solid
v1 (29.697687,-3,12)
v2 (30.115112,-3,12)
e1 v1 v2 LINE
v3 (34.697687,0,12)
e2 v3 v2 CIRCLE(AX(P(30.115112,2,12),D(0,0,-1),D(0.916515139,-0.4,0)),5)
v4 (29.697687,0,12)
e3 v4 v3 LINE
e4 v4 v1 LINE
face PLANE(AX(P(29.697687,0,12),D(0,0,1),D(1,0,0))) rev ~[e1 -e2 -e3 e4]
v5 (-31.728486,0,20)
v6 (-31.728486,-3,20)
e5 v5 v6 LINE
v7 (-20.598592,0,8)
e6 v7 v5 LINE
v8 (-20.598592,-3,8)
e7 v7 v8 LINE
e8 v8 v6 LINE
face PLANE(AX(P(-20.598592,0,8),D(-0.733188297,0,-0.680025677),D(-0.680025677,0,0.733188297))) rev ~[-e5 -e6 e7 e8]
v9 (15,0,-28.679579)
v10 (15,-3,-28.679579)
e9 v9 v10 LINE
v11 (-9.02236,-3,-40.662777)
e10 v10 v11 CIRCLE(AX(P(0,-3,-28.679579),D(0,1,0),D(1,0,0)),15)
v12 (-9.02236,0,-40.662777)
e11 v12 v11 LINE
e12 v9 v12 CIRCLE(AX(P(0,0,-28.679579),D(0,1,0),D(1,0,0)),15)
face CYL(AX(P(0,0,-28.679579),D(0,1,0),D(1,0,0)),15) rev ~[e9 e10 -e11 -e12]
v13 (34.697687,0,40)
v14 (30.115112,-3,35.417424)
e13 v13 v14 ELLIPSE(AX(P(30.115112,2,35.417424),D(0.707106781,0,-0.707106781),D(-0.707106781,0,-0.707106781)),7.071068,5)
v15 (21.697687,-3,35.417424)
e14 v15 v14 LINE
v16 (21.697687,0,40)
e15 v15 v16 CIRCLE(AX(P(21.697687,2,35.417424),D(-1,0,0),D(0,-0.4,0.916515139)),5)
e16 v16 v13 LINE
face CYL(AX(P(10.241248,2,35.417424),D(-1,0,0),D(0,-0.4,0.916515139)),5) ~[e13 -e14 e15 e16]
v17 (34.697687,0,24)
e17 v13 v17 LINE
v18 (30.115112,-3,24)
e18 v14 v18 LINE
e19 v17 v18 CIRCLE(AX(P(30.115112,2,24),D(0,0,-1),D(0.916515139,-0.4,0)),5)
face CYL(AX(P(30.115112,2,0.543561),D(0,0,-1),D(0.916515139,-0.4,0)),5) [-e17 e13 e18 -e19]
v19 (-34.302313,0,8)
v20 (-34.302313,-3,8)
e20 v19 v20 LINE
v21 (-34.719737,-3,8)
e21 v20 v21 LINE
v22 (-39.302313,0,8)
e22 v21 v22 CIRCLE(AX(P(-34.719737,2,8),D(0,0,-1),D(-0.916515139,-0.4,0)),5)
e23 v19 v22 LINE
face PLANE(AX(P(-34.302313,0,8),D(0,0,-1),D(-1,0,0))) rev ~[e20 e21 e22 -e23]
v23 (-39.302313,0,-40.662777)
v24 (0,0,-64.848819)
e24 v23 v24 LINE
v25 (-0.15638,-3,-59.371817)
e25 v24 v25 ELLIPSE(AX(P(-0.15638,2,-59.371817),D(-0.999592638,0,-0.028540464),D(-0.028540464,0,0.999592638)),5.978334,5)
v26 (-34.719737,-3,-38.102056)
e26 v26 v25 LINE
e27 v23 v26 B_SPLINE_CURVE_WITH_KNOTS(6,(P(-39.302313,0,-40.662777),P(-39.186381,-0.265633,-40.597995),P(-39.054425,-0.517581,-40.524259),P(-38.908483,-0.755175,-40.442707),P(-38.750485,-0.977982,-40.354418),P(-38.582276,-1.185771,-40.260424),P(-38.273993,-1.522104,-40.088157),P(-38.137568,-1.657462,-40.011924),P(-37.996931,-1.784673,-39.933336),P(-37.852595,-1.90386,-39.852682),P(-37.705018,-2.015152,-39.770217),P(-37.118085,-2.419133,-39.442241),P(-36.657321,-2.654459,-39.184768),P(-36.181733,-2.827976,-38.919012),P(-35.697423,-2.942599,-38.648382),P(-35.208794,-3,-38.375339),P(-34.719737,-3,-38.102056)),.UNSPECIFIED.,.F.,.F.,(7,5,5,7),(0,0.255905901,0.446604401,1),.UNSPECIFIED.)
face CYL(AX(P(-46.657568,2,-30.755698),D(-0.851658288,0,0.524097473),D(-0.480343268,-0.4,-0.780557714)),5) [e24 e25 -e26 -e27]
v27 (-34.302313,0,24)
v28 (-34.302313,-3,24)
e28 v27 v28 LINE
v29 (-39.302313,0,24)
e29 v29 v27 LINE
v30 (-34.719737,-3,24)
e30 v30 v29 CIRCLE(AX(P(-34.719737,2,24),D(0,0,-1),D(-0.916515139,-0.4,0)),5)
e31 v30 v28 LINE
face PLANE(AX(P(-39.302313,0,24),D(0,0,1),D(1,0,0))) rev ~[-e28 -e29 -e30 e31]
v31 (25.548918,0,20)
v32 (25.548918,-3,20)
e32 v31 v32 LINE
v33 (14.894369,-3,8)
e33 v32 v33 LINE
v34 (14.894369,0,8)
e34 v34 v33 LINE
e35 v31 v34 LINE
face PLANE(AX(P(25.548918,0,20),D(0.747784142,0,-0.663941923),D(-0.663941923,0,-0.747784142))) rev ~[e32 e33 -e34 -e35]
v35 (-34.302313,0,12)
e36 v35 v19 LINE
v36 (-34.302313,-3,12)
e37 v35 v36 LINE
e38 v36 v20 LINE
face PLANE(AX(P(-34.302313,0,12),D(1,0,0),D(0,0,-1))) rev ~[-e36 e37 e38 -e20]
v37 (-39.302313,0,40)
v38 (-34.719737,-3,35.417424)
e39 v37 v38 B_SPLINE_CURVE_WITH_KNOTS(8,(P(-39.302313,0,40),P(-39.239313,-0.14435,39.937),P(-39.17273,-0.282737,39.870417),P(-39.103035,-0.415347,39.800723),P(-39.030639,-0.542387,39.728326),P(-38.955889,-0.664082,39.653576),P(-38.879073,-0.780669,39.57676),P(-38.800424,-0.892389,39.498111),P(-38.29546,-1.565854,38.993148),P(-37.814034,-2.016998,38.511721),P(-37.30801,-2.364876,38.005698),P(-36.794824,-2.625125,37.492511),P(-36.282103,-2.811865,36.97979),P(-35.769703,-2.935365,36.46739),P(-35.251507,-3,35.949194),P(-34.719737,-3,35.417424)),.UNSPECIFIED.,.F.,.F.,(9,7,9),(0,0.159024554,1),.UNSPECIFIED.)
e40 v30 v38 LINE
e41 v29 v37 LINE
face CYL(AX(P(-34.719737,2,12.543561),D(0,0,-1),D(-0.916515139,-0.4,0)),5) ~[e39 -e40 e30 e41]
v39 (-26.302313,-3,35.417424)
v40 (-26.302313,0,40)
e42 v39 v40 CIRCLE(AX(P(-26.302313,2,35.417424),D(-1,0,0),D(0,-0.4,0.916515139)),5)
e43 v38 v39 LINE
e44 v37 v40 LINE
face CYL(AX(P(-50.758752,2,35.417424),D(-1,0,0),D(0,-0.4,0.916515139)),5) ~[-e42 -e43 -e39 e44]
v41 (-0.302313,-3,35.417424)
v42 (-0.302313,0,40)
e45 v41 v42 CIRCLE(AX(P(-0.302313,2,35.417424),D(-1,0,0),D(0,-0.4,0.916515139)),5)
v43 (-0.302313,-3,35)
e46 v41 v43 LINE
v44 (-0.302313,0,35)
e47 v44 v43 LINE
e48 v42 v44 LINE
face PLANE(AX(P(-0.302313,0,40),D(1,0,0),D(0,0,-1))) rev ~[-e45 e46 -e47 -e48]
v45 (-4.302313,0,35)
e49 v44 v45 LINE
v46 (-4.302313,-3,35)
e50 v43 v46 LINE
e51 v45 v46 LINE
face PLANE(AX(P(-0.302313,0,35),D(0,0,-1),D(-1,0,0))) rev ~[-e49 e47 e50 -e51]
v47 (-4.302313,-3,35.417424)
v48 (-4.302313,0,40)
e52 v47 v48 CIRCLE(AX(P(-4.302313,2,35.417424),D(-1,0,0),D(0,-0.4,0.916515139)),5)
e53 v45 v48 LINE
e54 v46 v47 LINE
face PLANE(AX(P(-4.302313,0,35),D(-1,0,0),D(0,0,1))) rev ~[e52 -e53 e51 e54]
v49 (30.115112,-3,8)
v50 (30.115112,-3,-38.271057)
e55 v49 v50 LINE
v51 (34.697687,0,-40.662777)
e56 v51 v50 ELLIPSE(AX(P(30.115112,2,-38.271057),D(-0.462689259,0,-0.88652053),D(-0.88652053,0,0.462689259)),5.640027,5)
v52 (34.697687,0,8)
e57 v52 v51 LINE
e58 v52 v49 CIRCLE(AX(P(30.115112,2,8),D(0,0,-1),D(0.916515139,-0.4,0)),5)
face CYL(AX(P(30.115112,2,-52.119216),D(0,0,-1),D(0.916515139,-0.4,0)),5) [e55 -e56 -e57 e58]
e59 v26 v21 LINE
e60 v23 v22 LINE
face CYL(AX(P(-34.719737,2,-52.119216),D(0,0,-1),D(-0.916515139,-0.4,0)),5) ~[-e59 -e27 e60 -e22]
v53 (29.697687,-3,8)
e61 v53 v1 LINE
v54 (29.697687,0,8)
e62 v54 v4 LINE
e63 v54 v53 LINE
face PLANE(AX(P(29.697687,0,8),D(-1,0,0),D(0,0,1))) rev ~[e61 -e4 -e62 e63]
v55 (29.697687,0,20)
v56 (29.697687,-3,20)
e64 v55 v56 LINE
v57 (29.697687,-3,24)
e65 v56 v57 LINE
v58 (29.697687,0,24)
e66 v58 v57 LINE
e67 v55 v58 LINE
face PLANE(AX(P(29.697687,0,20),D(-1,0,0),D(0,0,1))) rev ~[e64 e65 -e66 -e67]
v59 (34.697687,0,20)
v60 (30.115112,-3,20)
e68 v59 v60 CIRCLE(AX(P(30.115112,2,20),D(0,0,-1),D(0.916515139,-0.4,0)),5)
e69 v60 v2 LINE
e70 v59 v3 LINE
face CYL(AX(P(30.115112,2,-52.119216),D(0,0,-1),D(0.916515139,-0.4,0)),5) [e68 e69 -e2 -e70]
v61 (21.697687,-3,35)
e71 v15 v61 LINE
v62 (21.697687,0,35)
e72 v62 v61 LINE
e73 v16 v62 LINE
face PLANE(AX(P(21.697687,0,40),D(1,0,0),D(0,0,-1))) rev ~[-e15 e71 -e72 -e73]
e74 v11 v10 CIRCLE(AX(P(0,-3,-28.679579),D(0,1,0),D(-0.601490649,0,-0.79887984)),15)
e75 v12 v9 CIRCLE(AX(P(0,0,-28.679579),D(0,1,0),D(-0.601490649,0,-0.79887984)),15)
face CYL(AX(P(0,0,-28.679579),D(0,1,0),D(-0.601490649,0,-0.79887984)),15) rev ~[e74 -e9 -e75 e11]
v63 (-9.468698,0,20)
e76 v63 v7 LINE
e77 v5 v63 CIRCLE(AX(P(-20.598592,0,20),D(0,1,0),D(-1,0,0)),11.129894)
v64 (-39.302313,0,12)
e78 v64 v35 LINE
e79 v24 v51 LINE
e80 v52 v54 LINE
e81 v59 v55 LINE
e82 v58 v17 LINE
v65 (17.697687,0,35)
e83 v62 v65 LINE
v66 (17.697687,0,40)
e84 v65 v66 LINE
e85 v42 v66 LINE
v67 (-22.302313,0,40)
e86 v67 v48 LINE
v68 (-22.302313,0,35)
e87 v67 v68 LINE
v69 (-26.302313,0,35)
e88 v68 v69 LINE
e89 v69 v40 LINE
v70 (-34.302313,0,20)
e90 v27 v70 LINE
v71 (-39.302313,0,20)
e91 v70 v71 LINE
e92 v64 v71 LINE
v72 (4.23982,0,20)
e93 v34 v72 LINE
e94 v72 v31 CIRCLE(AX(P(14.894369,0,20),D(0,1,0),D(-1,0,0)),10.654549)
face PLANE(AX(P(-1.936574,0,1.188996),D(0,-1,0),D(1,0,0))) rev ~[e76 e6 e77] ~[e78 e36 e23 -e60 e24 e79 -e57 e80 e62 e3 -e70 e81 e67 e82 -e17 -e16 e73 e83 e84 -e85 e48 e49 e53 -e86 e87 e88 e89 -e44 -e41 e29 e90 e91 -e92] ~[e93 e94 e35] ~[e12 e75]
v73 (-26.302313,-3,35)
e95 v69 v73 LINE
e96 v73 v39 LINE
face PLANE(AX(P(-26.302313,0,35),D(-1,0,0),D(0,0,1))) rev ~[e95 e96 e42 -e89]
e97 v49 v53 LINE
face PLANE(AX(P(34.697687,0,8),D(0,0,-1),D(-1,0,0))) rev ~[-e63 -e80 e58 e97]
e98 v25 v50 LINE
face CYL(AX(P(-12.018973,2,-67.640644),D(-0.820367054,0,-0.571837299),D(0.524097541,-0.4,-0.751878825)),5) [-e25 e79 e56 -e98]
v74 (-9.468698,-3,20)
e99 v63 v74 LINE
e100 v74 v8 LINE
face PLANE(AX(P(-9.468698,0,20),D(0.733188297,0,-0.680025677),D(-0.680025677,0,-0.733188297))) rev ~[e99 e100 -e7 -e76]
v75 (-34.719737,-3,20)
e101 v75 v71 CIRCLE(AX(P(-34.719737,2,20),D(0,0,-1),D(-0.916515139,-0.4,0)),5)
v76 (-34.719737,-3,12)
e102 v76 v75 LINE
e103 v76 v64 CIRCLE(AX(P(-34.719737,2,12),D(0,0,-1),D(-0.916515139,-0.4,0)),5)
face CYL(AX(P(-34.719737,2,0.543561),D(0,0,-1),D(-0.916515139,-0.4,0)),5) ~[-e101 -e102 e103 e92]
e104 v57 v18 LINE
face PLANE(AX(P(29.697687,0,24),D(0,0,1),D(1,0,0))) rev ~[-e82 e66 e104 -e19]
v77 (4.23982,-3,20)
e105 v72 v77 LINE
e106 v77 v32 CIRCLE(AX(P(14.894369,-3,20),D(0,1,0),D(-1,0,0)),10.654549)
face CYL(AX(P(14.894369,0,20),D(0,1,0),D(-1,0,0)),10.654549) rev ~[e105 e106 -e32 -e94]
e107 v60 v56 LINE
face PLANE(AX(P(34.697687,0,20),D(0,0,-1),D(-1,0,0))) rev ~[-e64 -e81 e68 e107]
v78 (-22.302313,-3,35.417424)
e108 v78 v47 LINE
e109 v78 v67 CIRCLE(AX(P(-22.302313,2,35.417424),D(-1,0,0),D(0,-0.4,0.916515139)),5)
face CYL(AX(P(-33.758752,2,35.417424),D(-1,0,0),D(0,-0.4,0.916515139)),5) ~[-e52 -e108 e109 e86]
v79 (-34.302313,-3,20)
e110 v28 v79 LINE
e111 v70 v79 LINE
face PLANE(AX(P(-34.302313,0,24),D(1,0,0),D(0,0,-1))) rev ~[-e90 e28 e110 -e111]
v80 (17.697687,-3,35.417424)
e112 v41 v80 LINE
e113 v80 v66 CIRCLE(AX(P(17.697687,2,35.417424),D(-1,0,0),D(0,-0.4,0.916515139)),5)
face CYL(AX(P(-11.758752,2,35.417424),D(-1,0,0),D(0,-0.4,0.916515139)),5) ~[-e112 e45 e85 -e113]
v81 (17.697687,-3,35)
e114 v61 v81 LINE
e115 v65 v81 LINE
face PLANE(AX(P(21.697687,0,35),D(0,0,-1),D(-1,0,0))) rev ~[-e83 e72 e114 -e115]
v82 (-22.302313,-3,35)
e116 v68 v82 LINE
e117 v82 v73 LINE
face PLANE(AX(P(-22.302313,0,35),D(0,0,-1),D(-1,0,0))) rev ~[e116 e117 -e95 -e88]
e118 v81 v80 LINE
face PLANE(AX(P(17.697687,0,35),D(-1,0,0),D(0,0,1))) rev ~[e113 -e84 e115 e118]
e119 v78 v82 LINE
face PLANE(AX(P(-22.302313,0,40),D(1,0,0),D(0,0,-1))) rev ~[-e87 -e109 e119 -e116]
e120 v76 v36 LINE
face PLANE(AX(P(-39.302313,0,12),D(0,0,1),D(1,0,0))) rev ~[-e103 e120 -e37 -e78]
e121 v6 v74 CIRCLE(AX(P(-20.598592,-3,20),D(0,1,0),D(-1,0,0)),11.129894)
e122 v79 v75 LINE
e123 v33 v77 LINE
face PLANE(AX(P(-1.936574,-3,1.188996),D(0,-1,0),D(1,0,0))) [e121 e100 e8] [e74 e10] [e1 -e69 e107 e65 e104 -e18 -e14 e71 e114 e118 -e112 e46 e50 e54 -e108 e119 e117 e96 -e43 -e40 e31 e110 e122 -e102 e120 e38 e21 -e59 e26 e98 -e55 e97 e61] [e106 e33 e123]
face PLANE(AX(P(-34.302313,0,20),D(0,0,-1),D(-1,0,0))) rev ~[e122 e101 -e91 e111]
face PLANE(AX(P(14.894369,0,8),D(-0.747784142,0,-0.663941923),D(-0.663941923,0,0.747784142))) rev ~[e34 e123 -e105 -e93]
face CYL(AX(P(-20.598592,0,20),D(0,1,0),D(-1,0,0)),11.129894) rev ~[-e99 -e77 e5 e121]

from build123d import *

# Parameters (mm, degrees)
F1_DEPTH     = 3
F2_T1_DEPTH  = 69.0608621697
F2_T3_DEPTH  = 65.2081986538
F2_T5_DEPTH  = 71.5756555765
F2_T7_DEPTH  = 30.9128784748
F2_T9_DEPTH  = 38.9128784748
F2_T11_DEPTH = 35.9128784748
F2_T13_DEPTH = 40.9128784748
F2_T15_DEPTH = 40.9128784748
F2_T17_DEPTH = 35.9128784748


# Not quite as in the source:
# - a fillet or chamfer that OpenCascade refuses, or shapes differently, is made with other operations: its cross-section is extruded or revolved along the edge and cut away or added


with BuildPart() as f1:
    # F0 (on Front) → F1 (new body)
    with BuildSketch(Plane.XZ):
        with BuildLine():
            Line((-39.3023127707, 0), (-39.3023127707, -40.6627771018))
            Line((-39.3023127707, -40.6627771018), (-9.0223597329, -40.6627771018))
            ThreePointArc((-9.0223597329, -40.6627771018), (-6.6956927949, -15.256923351), (15, -28.6795794964))
            ThreePointArc((15, -28.6795794964), (13.4226561454, -35.3752722912), (9.0223597329, -40.6627771018))
            Line((9.0223597329, -40.6627771018), (34.6976872293, -40.6627771018))
            Line((34.6976872293, -40.6627771018), (34.6976872293, 0))
            Line((34.6976872293, 0), (34.6976872293, 8))
            Line((34.6976872293, 8), (29.6976872293, 8))
            Line((29.6976872293, 8), (29.6976872293, 12))
            Line((29.6976872293, 12), (34.6976872293, 12))
            Line((34.6976872293, 12), (34.6976872293, 20))
            Line((34.6976872293, 20), (29.6976872293, 20))
            Line((29.6976872293, 20), (29.6976872293, 24))
            Line((29.6976872293, 24), (34.6976872293, 24))
            Line((34.6976872293, 24), (34.6976872293, 40))
            Line((34.6976872293, 40), (21.6976872293, 40))
            Line((21.6976872293, 40), (21.6976872293, 35))
            Line((21.6976872293, 35), (17.6976872293, 35))
            Line((17.6976872293, 35), (17.6976872293, 40))
            Line((17.6976872293, 40), (-0.3023127707, 40))
            Line((-0.3023127707, 40), (-0.3023127707, 35))
            Line((-0.3023127707, 35), (-4.3023127707, 35))
            Line((-4.3023127707, 35), (-4.3023127707, 40))
            Line((-4.3023127707, 40), (-22.3023127707, 40))
            Line((-22.3023127707, 40), (-22.3023127707, 35))
            Line((-22.3023127707, 35), (-26.3023127707, 35))
            Line((-26.3023127707, 35), (-26.3023127707, 40))
            Line((-26.3023127707, 40), (-39.3023127707, 40))
            Line((-39.3023127707, 40), (-39.3023127707, 24))
            Line((-39.3023127707, 24), (-34.3023127707, 24))
            Line((-34.3023127707, 24), (-34.3023127707, 20))
            Line((-34.3023127707, 20), (-39.3023127707, 20))
            Line((-39.3023127707, 20), (-39.3023127707, 12))
            Line((-39.3023127707, 12), (-34.3023127707, 12))
            Line((-34.3023127707, 12), (-34.3023127707, 8))
            Line((-34.3023127707, 8), (-39.3023127707, 8))
            Line((-39.3023127707, 8), (-39.3023127707, 0))
        make_face()
        with BuildLine():
            ThreePointArc((-31.7284863554, 20), (-20.5985922366, 31.1298941188), (-9.4686981178, 20))
            Line((-9.4686981178, 20), (-20.5985922366, 8))
            Line((-20.5985922366, 8), (-31.7284863554, 20))
        make_face(mode=Mode.SUBTRACT)
        with BuildLine():
            ThreePointArc((4.2398196727, 20), (14.8943690583, 30.6545493856), (25.5489184439, 20))
            Line((25.5489184439, 20), (14.8943690583, 8))
            Line((14.8943690583, 8), (4.2398196727, 20))
        make_face(mode=Mode.SUBTRACT)
        with BuildLine():
            Line((-9.0223597329, -40.6627771018), (-39.3023127707, -40.6627771018))
            Line((-39.3023127707, -40.6627771018), (0, -64.8488187371))
            Line((0, -64.8488187371), (34.6976872293, -40.6627771018))
            Line((34.6976872293, -40.6627771018), (9.0223597329, -40.6627771018))
            ThreePointArc((9.0223597329, -40.6627771018), (0, -43.6795794964), (-9.0223597329, -40.6627771018))
        make_face()
    extrude(amount=F1_DEPTH)

    # F2: fillet of radius 5 on 12 edges, made by hand

    # F2_s2 → F2_t1 (cut)
    with BuildSketch(Plane(origin=(-20.1138870842, 0, 12.3777782062), x_dir=(0, 1, 0), z_dir=(0.8516582876, 0, -0.5240974729))):
        with BuildLine():
            ThreePointArc((0, -55.2290339197), (-2.1833001327, -53.3850710123), (-3, -50.6464582247))
            Line((-3, -50.6464582247), (-3, -55.2290339197))
            Line((-3, -55.2290339197), (0, -55.2290339197))
        make_face()
    extrude(amount=F2_T1_DEPTH, mode=Mode.SUBTRACT)

    # F2_s4 → F2_t3 (cut)
    with BuildSketch(Plane(origin=(-39.8201349052, 0, -27.7566465561), x_dir=(0, 1, 0), z_dir=(0.8203670544, 0, 0.5718372986))):
        with BuildLine():
            ThreePointArc((0, -53.1998344073), (-2.1833001327, -51.3558714999), (-3, -48.6172587124))
            Line((-3, -48.6172587124), (-3, -53.1998344073))
            Line((-3, -53.1998344073), (0, -53.1998344073))
        make_face()
    extrude(amount=F2_T3_DEPTH, mode=Mode.SUBTRACT)

    # F2_s6 → F2_t5 (cut)
    with BuildSketch(Plane.XY.offset(-52.1192163392)):
        with BuildLine():
            ThreePointArc((-39.3023127707, 0), (-37.4583498632, -2.1833001327), (-34.7197370757, -3))
            Line((-34.7197370757, -3), (-39.3023127707, -3))
            Line((-39.3023127707, -3), (-39.3023127707, 0))
        make_face()
        with BuildLine():
            ThreePointArc((34.6976872293, 0), (32.8537243219, -2.1833001327), (30.1151115344, -3))
            Line((30.1151115344, -3), (34.6976872293, -3))
            Line((34.6976872293, -3), (34.6976872293, 0))
        make_face()
    extrude(amount=F2_T5_DEPTH, mode=Mode.SUBTRACT)

    # F2_s8 → F2_t7 (cut)
    with BuildSketch(Plane.XY.offset(0.5435607626)):
        with BuildLine():
            ThreePointArc((-39.3023127707, 0), (-37.4583498632, -2.1833001327), (-34.7197370757, -3))
            Line((-34.7197370757, -3), (-39.3023127707, -3))
            Line((-39.3023127707, -3), (-39.3023127707, 0))
        make_face()
        with BuildLine():
            ThreePointArc((34.6976872293, 0), (32.8537243219, -2.1833001327), (30.1151115344, -3))
            Line((30.1151115344, -3), (34.6976872293, -3))
            Line((34.6976872293, -3), (34.6976872293, 0))
        make_face()
    extrude(amount=F2_T7_DEPTH, mode=Mode.SUBTRACT)

    # F2_s10 → F2_t9 (cut)
    with BuildSketch(Plane.XY.offset(12.5435607626)):
        with BuildLine():
            ThreePointArc((-39.3023127707, 0), (-37.4583498632, -2.1833001327), (-34.7197370757, -3))
            Line((-34.7197370757, -3), (-39.3023127707, -3))
            Line((-39.3023127707, -3), (-39.3023127707, 0))
        make_face()
        with BuildLine():
            ThreePointArc((34.6976872293, 0), (32.8537243219, -2.1833001327), (30.1151115344, -3))
            Line((30.1151115344, -3), (34.6976872293, -3))
            Line((34.6976872293, -3), (34.6976872293, 0))
        make_face()
    extrude(amount=F2_T9_DEPTH, mode=Mode.SUBTRACT)

    # F2_s12 → F2_t11 (cut)
    with BuildSketch(Plane.YZ.offset(-50.7587520081)):
        with BuildLine():
            ThreePointArc((0, 40), (-2.1833001327, 38.1560370926), (-3, 35.417424305))
            Line((-3, 35.417424305), (-3, 40))
            Line((-3, 40), (0, 40))
        make_face()
    extrude(amount=F2_T11_DEPTH, mode=Mode.SUBTRACT)

    # F2_s14 → F2_t13 (cut)
    with BuildSketch(Plane.YZ.offset(-33.7587520081)):
        with BuildLine():
            ThreePointArc((0, 40), (-2.1833001327, 38.1560370926), (-3, 35.417424305))
            Line((-3, 35.417424305), (-3, 40))
            Line((-3, 40), (0, 40))
        make_face()
    extrude(amount=F2_T13_DEPTH, mode=Mode.SUBTRACT)

    # F2_s16 → F2_t15 (cut)
    with BuildSketch(Plane.YZ.offset(-11.7587520081)):
        with BuildLine():
            ThreePointArc((0, 40), (-2.1833001327, 38.1560370926), (-3, 35.417424305))
            Line((-3, 35.417424305), (-3, 40))
            Line((-3, 40), (0, 40))
        make_face()
    extrude(amount=F2_T15_DEPTH, mode=Mode.SUBTRACT)

    # F2_s18 → F2_t17 (cut)
    with BuildSketch(Plane.YZ.offset(10.2412479919)):
        with BuildLine():
            ThreePointArc((0, 40), (-2.1833001327, 38.1560370926), (-3, 35.417424305))
            Line((-3, 35.417424305), (-3, 40))
            Line((-3, 40), (0, 40))
        make_face()
    extrude(amount=F2_T17_DEPTH, mode=Mode.SUBTRACT)


solid = f1.part
